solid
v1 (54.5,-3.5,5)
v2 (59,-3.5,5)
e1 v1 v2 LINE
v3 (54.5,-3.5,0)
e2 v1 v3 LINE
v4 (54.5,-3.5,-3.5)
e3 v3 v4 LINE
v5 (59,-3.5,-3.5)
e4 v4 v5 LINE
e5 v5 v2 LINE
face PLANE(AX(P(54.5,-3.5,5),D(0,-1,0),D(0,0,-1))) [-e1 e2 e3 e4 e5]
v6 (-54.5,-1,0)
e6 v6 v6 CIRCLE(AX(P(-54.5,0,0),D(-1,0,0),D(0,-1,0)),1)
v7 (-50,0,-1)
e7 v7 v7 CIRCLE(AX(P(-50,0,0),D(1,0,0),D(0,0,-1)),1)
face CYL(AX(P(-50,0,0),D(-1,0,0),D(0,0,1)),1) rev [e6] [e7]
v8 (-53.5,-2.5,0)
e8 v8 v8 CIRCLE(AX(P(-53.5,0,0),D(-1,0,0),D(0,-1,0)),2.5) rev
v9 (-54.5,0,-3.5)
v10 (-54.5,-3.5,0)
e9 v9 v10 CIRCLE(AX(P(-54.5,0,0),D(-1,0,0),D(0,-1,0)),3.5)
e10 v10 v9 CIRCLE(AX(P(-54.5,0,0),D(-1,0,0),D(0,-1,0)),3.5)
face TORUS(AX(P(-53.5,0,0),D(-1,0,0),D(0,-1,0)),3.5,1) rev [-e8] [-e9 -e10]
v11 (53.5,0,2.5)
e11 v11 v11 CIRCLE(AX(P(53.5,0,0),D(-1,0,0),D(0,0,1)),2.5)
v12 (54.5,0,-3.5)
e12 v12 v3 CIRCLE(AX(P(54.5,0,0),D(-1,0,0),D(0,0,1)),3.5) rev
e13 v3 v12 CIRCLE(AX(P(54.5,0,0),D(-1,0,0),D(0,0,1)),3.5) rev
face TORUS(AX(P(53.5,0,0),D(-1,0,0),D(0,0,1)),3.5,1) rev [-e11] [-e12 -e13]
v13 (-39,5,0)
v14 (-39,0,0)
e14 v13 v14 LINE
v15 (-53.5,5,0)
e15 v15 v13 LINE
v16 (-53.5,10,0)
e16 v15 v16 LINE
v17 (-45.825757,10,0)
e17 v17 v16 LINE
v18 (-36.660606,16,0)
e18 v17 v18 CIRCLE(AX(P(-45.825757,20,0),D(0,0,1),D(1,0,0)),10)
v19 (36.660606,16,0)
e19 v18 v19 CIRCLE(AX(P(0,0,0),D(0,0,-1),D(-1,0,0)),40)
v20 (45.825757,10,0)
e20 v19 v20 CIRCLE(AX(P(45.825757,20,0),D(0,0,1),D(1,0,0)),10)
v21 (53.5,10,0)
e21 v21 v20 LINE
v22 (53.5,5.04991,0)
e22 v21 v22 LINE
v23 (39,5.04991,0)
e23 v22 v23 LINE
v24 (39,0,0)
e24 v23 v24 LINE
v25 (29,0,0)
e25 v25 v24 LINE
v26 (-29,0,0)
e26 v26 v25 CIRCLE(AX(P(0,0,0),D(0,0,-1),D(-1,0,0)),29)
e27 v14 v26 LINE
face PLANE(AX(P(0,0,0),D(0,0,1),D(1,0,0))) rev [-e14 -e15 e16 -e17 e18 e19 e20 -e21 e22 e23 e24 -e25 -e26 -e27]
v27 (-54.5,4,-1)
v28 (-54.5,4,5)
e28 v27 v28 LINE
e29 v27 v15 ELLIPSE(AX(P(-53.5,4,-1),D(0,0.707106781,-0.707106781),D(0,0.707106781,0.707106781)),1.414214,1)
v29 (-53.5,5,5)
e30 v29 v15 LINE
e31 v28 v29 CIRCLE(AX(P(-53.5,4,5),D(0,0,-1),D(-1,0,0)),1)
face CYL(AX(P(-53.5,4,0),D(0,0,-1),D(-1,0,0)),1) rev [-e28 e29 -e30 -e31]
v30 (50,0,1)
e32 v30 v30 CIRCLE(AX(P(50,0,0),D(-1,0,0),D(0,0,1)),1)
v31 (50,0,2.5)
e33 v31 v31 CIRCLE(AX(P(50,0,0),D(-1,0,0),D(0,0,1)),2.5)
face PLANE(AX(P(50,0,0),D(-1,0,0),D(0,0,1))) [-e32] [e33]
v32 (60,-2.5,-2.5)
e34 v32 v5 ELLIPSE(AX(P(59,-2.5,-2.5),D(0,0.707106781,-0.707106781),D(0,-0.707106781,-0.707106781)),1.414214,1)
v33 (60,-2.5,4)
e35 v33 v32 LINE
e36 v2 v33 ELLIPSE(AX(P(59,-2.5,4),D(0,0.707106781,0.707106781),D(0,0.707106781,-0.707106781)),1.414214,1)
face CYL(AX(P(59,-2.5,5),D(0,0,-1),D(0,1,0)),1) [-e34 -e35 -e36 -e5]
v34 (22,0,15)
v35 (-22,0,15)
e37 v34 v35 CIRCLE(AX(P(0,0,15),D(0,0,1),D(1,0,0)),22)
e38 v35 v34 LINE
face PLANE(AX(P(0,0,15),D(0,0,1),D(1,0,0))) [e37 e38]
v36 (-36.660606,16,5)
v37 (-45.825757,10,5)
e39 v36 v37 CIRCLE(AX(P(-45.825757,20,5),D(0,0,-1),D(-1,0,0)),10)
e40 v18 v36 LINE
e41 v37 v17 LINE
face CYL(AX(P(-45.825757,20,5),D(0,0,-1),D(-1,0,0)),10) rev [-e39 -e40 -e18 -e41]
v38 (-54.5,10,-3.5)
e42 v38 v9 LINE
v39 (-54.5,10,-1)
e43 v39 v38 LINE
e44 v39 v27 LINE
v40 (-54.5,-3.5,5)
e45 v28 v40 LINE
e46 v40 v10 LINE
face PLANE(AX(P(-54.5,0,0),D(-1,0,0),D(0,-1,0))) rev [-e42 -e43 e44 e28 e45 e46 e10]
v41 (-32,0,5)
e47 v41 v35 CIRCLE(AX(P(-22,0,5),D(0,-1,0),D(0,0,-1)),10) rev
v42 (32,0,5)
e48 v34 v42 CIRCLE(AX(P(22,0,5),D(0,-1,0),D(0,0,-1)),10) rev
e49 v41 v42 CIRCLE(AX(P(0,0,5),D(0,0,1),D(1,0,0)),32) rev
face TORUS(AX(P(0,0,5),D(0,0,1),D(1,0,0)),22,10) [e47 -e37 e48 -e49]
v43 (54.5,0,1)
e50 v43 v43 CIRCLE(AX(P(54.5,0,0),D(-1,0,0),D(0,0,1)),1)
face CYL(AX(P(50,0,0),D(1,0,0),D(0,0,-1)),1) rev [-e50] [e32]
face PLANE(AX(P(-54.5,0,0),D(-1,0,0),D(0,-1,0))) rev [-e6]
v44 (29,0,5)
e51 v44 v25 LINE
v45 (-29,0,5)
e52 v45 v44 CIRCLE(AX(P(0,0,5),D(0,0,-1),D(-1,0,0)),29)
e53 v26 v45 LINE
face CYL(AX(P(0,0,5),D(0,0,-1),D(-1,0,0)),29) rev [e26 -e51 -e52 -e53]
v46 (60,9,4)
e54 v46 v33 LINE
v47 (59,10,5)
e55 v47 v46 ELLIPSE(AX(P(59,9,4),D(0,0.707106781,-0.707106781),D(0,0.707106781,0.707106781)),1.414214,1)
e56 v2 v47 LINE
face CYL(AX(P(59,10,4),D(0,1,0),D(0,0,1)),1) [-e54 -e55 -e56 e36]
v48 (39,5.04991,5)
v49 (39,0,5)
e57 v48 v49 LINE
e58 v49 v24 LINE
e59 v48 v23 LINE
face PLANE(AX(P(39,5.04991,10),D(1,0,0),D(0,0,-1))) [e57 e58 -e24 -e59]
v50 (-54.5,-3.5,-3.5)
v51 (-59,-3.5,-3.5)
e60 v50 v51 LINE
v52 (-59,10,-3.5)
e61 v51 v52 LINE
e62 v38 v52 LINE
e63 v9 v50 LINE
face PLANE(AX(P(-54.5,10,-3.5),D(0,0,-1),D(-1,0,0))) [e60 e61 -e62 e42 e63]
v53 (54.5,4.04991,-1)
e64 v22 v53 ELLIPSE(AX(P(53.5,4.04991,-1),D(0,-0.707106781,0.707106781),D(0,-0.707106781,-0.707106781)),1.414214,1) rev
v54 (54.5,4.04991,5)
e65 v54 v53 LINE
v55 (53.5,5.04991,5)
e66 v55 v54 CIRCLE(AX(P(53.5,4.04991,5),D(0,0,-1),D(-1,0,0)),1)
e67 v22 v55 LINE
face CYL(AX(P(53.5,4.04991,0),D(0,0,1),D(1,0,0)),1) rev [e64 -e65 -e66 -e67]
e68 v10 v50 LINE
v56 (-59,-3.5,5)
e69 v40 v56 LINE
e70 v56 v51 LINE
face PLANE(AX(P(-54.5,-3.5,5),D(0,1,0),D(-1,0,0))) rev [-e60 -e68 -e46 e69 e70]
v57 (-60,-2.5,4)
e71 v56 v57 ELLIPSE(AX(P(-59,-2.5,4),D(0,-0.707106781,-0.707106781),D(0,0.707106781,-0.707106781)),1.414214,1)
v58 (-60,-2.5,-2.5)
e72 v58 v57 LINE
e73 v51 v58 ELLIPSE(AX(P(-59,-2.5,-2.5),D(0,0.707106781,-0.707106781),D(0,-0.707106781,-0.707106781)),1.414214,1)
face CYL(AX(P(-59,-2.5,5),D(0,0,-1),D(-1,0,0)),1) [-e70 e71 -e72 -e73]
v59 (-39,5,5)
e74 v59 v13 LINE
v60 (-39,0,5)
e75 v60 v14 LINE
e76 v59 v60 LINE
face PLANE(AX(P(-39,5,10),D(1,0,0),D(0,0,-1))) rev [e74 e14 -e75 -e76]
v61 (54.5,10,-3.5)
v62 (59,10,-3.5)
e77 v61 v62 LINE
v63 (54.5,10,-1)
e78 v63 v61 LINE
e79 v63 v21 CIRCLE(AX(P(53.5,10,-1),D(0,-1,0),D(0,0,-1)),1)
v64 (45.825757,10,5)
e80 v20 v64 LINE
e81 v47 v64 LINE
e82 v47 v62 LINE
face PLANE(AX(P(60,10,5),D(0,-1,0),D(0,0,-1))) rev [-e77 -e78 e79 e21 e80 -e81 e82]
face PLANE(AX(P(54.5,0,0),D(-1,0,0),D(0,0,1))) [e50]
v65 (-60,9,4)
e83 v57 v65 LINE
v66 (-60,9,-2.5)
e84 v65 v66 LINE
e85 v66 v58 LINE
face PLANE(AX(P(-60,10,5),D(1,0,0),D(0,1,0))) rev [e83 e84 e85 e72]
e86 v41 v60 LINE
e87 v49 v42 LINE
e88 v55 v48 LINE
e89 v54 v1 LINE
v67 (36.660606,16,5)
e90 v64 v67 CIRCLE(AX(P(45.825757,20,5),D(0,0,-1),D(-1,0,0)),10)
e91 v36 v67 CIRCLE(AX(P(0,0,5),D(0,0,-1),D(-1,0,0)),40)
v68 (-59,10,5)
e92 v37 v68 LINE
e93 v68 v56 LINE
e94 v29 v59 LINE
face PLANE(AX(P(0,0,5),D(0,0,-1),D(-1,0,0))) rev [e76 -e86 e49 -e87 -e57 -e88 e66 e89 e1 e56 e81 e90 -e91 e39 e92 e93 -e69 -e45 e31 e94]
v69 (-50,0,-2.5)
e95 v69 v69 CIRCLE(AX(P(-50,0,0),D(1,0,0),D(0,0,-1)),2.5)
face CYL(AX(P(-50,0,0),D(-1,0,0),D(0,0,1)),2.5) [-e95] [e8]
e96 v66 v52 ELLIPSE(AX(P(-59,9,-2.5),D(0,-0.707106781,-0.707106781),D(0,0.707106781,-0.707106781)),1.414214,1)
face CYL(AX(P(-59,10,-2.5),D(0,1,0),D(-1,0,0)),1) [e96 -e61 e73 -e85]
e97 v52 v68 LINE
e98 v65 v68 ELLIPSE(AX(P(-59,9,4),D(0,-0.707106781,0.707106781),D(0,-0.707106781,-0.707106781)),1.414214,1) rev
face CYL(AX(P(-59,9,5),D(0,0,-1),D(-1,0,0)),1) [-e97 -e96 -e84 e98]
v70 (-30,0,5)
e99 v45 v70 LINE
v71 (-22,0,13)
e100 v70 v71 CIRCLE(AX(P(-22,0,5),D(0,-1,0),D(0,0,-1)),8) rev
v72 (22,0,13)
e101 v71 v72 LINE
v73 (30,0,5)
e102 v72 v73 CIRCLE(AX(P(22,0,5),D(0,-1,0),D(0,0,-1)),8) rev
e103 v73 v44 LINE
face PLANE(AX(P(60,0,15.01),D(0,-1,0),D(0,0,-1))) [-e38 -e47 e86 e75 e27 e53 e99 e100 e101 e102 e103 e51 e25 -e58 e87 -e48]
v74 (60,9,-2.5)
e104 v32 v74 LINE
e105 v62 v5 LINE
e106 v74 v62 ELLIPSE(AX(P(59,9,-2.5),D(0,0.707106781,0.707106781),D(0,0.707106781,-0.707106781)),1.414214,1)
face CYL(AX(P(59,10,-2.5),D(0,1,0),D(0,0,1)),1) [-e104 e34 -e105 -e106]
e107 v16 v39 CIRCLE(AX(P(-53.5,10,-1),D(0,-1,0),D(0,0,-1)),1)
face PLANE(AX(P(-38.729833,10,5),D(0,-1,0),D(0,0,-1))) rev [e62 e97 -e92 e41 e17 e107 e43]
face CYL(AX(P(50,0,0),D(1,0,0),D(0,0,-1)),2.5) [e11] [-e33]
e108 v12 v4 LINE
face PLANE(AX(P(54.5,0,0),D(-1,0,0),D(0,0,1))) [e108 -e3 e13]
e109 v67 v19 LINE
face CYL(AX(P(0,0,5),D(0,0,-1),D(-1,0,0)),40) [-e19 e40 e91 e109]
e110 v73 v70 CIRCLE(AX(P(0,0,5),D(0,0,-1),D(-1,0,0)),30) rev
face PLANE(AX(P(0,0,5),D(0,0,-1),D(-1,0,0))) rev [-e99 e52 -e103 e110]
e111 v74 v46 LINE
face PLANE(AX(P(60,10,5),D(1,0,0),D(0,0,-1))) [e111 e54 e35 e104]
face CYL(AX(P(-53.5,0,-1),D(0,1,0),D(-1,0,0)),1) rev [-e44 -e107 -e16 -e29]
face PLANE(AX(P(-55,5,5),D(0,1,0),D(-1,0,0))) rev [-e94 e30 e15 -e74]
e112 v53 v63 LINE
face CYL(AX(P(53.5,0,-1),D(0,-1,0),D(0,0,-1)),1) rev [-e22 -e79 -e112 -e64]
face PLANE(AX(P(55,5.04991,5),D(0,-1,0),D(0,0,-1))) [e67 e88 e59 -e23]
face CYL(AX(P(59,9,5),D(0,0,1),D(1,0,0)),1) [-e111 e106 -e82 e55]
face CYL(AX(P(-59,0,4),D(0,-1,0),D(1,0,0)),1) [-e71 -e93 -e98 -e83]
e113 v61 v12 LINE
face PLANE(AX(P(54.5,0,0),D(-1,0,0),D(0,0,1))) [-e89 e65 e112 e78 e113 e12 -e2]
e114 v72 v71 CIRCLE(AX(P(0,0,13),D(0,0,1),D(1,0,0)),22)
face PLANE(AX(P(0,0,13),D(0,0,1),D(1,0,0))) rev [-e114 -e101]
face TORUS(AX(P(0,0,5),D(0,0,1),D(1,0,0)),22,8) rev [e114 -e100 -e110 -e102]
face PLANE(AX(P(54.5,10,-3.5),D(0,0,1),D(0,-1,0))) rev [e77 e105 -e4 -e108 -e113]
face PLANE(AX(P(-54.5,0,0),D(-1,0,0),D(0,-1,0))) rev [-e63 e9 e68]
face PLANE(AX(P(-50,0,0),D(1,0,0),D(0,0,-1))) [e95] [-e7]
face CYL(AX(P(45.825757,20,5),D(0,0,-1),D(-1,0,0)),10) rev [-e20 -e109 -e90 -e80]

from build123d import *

# Parameters (mm, degrees)
SKETCH1_R              = 32
BOSS_EXTRUDE1_DEPTH    = 15
FILLET1_R              = 10
SHELL1_T               = -2
SKETCH2_W              = 15
SKETCH2_H              = 10
BOSS_EXTRUDE2_DEPTH    = 5
SKETCH3_R              = 29
CUT_EXTRUDE1_DEPTH     = 5
SPLIT1_SURFACE_1_BACK  = 146
SPLIT1_SURFACE_1_DEPTH = 292
SPLIT1_SURFACE_2_BACK  = 146
SPLIT1_SURFACE_2_DEPTH = 292
SKETCH6_R              = 2.5
SKETCH6_R_2            = 1
BOSS_EXTRUDE3_DEPTH    = 5
BOSS_EXTRUDE4_START    = 5
SKETCH5_R              = 2.5
SKETCH5_R_2            = 1
BOSS_EXTRUDE4_DEPTH    = 5
SKETCH7_W              = 8.5
SKETCH7_H              = 13.5
BOSS_EXTRUDE5_DEPTH    = 5.5
SKETCH8_W              = 8.5
SKETCH8_H              = 13.5
BOSS_EXTRUDE6_DEPTH    = 5.5
FILLET3_R              = 1
FILLET4_R              = 10
SKETCH9_W              = 1
SKETCH9_H              = 5.049910015
SKETCH9_H_2            = 5
CUT_EXTRUDE2_DEPTH     = 10


with BuildPart() as part:
    # Sketch1 → Boss-Extrude1 (new body)
    with BuildSketch(Plane.XY):
        Circle(SKETCH1_R)
    extrude(amount=BOSS_EXTRUDE1_DEPTH)

    # Fillet1
    fillet1_edges = [part.edges().sort_by_distance(p)[0] for p in [
        (-32, 0, 15),
    ]]
    fillet(fillet1_edges, radius=FILLET1_R)

    # Shell1
    shell1_openings = [part.faces().sort_by_distance(p)[0] for p in [
        (0, 0, 0),
    ]]
    offset(amount=SHELL1_T, openings=shell1_openings, kind=Kind.INTERSECTION)

    # Sketch2 → Boss-Extrude2 (add)
    with BuildSketch(Plane(origin=(0, 0, 0), x_dir=(-1, 0, 0), z_dir=(0, 0, -1))):
        with BuildLine():
            Line((-60, 10), (-38.729833462, 10))
            ThreePointArc((-38.729833462, 10), (0, 40), (38.729833462, 10))
            Line((38.729833462, 10), (60, 10))
            Line((60, 10), (60, -10))
            Line((60, -10), (38.729833462, -10))
            ThreePointArc((38.729833462, -10), (0, -40), (-38.729833462, -10))
            Line((-38.729833462, -10), (-60, -10))
            Line((-60, -10), (-60, 10))
        make_face()
        with Locations((-47.5, 0.049910015)):
            Rectangle(SKETCH2_W, SKETCH2_H, mode=Mode.SUBTRACT)
        with Locations((47.5, 0)):
            Rectangle(SKETCH2_W, SKETCH2_H, mode=Mode.SUBTRACT)
    extrude(amount=-BOSS_EXTRUDE2_DEPTH)

    # Sketch3 → Cut-Extrude1 (cut)
    with BuildSketch(Plane(origin=(0, 0, 0), x_dir=(-1, 0, 0), z_dir=(0, 0, -1))):
        Circle(SKETCH3_R)
    extrude(amount=-CUT_EXTRUDE1_DEPTH, mode=Mode.SUBTRACT)


with BuildPart() as body_2:
    # Split1: the piece behind the surface
    add(part.part)
    # Split1 surface: a surface, the sketch's curves swept straight by 292 mm
    with BuildLine(Plane(origin=(0, 0, 0), x_dir=(-1, 0, 0), z_dir=(0, 0, -1)).offset(-SPLIT1_SURFACE_1_BACK), mode=Mode.PRIVATE) as split1_surface_1_path:
        Line((-60, 0), (60, 0))
    split1_surface_1 = Shell.extrude(split1_surface_1_path.wire(), (0 * SPLIT1_SURFACE_1_DEPTH, 0 * SPLIT1_SURFACE_1_DEPTH, -1 * SPLIT1_SURFACE_1_DEPTH))
    split(bisect_by=split1_surface_1, keep=Keep.BOTTOM)


with BuildPart() as part_1:
    add(part.part)

    # Split1: split by a surface, the side it looks to stays
    # Split1 surface: a surface, the sketch's curves swept straight by 292 mm
    with BuildLine(Plane(origin=(0, 0, 0), x_dir=(-1, 0, 0), z_dir=(0, 0, -1)).offset(-SPLIT1_SURFACE_2_BACK), mode=Mode.PRIVATE) as split1_surface_2_path:
        Line((-60, 0), (60, 0))
    split1_surface_2 = Shell.extrude(split1_surface_2_path.wire(), (0 * SPLIT1_SURFACE_2_DEPTH, 0 * SPLIT1_SURFACE_2_DEPTH, -1 * SPLIT1_SURFACE_2_DEPTH))
    split(bisect_by=split1_surface_2, keep=Keep.TOP)

    # Sketch6 → Boss-Extrude3 (add)
    with BuildSketch(Plane.ZY.offset(-55)):
        Circle(SKETCH6_R)
        Circle(SKETCH6_R_2, mode=Mode.SUBTRACT)
    extrude(amount=BOSS_EXTRUDE3_DEPTH)

    # Sketch5 → Boss-Extrude4 (add)
    with BuildSketch(Plane(origin=(-55, 0, 0), x_dir=(0, 0, -1), z_dir=(1, 0, 0)).offset(BOSS_EXTRUDE4_START)):
        with Locations(Location((0, 0, 0), (0, 0, 180))):
            Circle(SKETCH5_R)
        with Locations(Location((0, 0, 0), (0, 0, 180))):
            Circle(SKETCH5_R_2, mode=Mode.SUBTRACT)
    extrude(amount=-BOSS_EXTRUDE4_DEPTH)

    # Sketch7 → Boss-Extrude5 (add)
    with BuildSketch(Plane(origin=(60, 0, 0), x_dir=(0, 0, -1), z_dir=(1, 0, 0))):
        with Locations((-0.75, 3.25)):
            Rectangle(SKETCH7_W, SKETCH7_H)
    extrude(amount=-BOSS_EXTRUDE5_DEPTH)

    # Sketch8 → Boss-Extrude6 (add)
    with BuildSketch(Plane.ZY.offset(60)):
        with Locations((0.75, 3.25)):
            Rectangle(SKETCH8_W, SKETCH8_H)
    extrude(amount=-BOSS_EXTRUDE6_DEPTH)

    # Fillet3
    fillet3_edges = [part_1.edges().sort_by_distance(p)[0] for p in [
        (60, 3.25, 5),
        (-60, 3.25, 5),
        (-60, 10, 0.75),
        (60, 10, 0.75),
        (54.5, 5.049910015, 2.5),
        (54.5, 7.524955008, 0),
        (54.5, 0, -2.5),
        (60, 3.25, -3.5),
        (60, -3.5, 0.75),
        (-54.5, 0, -2.5),
        (-54.5, 7.5, 0),
        (-54.5, 5, 2.5),
        (-60, -3.5, 0.75),
        (-60, 3.25, -3.5),
    ]]
    fillet(fillet3_edges, radius=FILLET3_R - 0.0001)  # a hair under: the kernel refuses the full size

    # Fillet4
    fillet4_edges = [part_1.edges().sort_by_distance(p)[0] for p in [
        (-38.729833462, 10, 2.5),
        (38.729833462, 10, 2.5),
    ]]
    fillet(fillet4_edges, radius=FILLET4_R)

    # Sketch9 → Cut-Extrude2 (cut)
    with BuildSketch(Plane(origin=(0, 0, 0), x_dir=(-1, 0, 0), z_dir=(0, 0, -1))):
        with Locations((-39.5, 2.524955008)):
            Rectangle(SKETCH9_W, SKETCH9_H)
        with Locations((39.5, 2.5)):
            Rectangle(SKETCH9_W, SKETCH9_H_2)
    extrude(amount=-CUT_EXTRUDE2_DEPTH, mode=Mode.SUBTRACT)


solid = part_1.part
